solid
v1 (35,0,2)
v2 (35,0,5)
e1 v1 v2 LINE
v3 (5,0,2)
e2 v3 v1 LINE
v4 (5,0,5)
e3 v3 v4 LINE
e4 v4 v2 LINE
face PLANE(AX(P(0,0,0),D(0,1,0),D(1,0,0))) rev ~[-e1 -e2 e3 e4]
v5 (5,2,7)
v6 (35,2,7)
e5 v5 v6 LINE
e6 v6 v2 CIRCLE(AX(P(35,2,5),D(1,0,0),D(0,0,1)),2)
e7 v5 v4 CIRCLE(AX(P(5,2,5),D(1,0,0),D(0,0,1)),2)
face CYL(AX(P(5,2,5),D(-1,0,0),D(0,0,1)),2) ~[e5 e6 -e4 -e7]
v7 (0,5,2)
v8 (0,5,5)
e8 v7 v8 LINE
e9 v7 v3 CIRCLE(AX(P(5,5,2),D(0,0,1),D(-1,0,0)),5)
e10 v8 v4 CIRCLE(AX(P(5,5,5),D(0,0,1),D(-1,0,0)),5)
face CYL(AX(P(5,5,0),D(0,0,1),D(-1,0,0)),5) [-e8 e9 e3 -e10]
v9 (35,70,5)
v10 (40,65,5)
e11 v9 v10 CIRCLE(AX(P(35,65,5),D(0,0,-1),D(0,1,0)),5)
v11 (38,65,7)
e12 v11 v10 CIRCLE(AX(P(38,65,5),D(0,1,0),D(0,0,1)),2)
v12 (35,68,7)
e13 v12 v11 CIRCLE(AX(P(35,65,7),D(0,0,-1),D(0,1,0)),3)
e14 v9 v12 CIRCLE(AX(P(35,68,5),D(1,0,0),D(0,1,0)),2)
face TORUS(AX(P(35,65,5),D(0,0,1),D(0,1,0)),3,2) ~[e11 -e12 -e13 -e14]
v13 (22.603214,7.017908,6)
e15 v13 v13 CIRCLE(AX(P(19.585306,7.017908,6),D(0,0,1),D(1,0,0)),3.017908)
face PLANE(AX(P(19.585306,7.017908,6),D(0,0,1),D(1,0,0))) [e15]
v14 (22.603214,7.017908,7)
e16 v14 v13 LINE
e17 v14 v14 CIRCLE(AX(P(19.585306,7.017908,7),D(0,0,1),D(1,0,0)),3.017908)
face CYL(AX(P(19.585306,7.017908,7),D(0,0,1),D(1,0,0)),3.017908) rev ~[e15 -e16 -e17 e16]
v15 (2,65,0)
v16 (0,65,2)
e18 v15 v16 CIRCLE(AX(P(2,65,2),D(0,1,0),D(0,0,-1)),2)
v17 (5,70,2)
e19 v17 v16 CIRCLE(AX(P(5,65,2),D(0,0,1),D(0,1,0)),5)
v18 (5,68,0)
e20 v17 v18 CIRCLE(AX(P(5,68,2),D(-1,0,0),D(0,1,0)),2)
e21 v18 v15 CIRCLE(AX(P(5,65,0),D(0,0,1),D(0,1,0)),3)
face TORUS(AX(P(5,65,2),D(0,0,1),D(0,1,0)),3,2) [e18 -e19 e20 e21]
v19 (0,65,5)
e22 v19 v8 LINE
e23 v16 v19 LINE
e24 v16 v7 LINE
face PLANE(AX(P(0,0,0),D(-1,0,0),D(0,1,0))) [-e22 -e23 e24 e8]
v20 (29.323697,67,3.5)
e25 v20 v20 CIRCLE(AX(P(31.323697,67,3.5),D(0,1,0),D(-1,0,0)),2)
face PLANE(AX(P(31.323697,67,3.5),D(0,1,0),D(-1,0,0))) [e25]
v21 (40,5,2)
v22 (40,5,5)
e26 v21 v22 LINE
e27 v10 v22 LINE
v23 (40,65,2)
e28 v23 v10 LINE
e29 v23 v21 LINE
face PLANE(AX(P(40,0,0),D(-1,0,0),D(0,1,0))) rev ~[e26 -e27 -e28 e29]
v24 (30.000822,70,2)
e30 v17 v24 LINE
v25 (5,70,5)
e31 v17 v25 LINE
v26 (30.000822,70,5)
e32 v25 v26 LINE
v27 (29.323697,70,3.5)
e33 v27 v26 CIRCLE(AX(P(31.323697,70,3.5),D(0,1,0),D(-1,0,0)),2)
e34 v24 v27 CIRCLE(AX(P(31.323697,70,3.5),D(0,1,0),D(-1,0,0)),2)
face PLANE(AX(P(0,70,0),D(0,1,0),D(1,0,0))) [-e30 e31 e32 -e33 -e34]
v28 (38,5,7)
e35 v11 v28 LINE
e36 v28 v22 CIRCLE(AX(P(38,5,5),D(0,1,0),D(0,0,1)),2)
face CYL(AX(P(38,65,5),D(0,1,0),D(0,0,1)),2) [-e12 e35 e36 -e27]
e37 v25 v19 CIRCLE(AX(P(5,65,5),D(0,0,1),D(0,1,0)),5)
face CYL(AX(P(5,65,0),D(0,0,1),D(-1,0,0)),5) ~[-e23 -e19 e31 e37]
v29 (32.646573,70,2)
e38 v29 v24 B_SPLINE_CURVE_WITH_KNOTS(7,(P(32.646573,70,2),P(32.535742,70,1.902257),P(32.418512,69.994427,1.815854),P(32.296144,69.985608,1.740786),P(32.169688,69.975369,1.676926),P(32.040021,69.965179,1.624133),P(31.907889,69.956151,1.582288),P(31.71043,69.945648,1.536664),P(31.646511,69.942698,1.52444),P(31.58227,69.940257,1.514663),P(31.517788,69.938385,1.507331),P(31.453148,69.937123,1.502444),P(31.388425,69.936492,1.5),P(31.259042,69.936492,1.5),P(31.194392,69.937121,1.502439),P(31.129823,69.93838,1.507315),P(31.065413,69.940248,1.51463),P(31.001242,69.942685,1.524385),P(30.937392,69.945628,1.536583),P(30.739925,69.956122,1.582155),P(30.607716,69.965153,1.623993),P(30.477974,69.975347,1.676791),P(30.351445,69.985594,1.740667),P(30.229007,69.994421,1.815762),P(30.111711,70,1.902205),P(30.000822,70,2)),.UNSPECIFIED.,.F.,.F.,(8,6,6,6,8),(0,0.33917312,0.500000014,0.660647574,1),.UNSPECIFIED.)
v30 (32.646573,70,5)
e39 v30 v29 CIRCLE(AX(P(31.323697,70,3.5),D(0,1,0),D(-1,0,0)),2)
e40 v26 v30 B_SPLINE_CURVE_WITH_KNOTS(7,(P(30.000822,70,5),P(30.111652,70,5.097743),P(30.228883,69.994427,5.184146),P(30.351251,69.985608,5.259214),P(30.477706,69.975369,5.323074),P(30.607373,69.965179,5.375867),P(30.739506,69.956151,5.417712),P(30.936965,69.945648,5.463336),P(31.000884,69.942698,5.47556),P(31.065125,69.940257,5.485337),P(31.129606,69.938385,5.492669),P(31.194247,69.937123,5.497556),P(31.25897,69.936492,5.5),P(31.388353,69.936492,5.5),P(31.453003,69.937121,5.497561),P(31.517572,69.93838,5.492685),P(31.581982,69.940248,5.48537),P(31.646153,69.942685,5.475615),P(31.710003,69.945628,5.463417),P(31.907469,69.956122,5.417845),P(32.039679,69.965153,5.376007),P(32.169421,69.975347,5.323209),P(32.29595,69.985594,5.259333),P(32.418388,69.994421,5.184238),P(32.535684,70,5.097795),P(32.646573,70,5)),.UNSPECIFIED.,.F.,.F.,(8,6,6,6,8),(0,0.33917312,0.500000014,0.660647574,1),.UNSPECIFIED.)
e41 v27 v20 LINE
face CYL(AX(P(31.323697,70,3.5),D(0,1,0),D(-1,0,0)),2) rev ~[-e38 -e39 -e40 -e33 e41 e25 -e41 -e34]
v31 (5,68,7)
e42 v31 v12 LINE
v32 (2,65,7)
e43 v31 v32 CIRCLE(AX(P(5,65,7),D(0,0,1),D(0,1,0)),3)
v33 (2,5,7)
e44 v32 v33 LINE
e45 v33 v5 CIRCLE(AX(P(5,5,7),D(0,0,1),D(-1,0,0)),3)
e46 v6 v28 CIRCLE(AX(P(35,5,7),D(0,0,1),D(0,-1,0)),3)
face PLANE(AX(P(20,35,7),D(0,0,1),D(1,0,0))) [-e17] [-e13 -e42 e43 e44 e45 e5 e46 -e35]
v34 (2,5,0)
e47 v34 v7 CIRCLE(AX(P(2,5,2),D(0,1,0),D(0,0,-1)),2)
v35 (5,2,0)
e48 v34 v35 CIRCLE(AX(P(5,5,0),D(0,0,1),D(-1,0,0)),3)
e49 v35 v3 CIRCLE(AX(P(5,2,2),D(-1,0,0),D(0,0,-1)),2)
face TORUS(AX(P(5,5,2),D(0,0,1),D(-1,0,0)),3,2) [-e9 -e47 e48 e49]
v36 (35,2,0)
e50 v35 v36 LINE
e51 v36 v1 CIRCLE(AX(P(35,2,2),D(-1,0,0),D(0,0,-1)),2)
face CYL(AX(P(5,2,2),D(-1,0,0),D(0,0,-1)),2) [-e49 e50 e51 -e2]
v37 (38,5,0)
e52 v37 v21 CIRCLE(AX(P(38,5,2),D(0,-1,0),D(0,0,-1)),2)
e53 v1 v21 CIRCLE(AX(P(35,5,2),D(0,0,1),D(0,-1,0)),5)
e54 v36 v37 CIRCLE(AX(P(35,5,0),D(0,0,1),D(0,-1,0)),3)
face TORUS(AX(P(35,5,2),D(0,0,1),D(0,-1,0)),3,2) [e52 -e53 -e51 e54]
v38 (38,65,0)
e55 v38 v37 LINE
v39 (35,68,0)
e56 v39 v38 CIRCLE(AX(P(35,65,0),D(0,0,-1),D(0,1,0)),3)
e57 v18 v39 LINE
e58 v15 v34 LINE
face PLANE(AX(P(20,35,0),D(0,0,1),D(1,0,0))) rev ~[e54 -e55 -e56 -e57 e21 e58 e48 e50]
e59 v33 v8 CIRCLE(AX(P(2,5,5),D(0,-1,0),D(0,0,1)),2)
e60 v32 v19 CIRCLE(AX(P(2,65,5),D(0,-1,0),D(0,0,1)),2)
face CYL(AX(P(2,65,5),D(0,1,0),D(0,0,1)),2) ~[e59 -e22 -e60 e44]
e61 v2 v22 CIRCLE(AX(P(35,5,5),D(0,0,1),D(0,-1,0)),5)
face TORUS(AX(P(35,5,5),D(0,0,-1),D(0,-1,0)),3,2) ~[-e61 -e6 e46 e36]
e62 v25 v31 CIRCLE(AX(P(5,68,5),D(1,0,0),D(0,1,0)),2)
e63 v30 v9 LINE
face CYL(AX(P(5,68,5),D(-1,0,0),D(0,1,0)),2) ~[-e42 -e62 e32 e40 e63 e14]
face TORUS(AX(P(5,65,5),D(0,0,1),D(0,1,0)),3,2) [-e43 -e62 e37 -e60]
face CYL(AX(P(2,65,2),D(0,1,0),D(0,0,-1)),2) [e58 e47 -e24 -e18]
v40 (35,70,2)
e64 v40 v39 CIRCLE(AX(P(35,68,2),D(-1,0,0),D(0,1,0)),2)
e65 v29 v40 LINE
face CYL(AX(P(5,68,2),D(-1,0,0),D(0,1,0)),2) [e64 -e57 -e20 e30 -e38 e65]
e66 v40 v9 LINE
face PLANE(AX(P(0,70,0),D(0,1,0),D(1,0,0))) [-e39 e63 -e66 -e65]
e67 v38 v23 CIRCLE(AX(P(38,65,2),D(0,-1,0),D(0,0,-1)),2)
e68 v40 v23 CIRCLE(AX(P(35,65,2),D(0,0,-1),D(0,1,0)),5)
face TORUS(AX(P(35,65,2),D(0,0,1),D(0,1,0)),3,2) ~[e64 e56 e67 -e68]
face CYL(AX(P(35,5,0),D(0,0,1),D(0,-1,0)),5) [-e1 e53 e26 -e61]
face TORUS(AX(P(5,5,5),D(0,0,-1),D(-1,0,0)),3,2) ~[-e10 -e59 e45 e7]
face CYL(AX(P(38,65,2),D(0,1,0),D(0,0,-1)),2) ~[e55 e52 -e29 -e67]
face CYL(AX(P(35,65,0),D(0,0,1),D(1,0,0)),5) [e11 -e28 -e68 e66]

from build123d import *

# Parameters (mm, degrees)
F0_W         = 40
F0_H         = 70
F1_DEPTH     = 7
F2_R         = 5
F3_R         = 2
F4_DEPTH     = 3
F6_T1_DEPTH  = 60
F6_T3_DEPTH  = 30
F6_T6_ANGLE  = 90
F6_T8_ANGLE  = 90
F6_T10_ANGLE = 90
F6_T12_ANGLE = 90
F6_T14_ANGLE = 90
F6_T16_ANGLE = 90
F6_T18_ANGLE = 90
F6_T20_ANGLE = 90
F7_R         = 3.0179077215
F8_DEPTH     = 1


# Not quite as in the source:
# - a fillet or chamfer that OpenCascade refuses, or shapes differently, is made with other operations: its cross-section is extruded or revolved along the edge and cut away or added
# - a feature of the source that left no trace in its solid (it failed there, or was rolled back) is left out


with BuildPart() as f1:
    # F0 (on Top) → F1 (new body)
    with BuildSketch(Plane.XY):
        with Locations((20, 35)):
            Rectangle(F0_W, F0_H)
    extrude(amount=F1_DEPTH)

    # F2
    f2_edges = [f1.edges().sort_by_distance(p)[0] for p in [
        (40, 0, 3.5),
        (40, 70, 3.5),
        (0, 70, 3.5),
        (0, 0, 3.5),
    ]]
    fillet(f2_edges, radius=F2_R)

    # F3 (on face) → F4 (cut)
    with BuildSketch(Plane(origin=(0, 70, 0), x_dir=(-1, 0, 0), z_dir=(0, 1, 0))):
        with Locations((-31.323697418, 3.5)):
            Circle(F3_R)
    extrude(amount=-F4_DEPTH, mode=Mode.SUBTRACT)

    # F6: fillet of radius 2 on 16 edges, made by hand

    # F6_s2 → F6_t1 (cut)
    with BuildSketch(Plane.XZ.offset(-65)):
        with BuildLine():
            ThreePointArc((2, 7), (0.5857864376, 6.4142135624), (0, 5))
            Line((0, 5), (0, 7))
            Line((0, 7), (2, 7))
        make_face()
        with BuildLine():
            ThreePointArc((38, 0), (39.4142135624, 0.5857864376), (40, 2))
            Line((40, 2), (40, 0))
            Line((40, 0), (38, 0))
        make_face()
        with BuildLine():
            ThreePointArc((2, 0), (0.5857864376, 0.5857864376), (0, 2))
            Line((0, 2), (0, 0))
            Line((0, 0), (2, 0))
        make_face()
        with BuildLine():
            ThreePointArc((38, 7), (39.4142135624, 6.4142135624), (40, 5))
            Line((40, 5), (40, 7))
            Line((40, 7), (38, 7))
        make_face()
    extrude(amount=F6_T1_DEPTH, mode=Mode.SUBTRACT)

    # F6_s4 → F6_t3 (cut)
    with BuildSketch(Plane.YZ.offset(5)):
        with BuildLine():
            ThreePointArc((70, 2), (69.4142135624, 0.5857864376), (68, 0))
            Line((68, 0), (70, 0))
            Line((70, 0), (70, 2))
        make_face()
        with BuildLine():
            ThreePointArc((70, 5), (69.4142135624, 6.4142135624), (68, 7))
            Line((68, 7), (70, 7))
            Line((70, 7), (70, 5))
        make_face()
        with BuildLine():
            ThreePointArc((2, 0), (0.5857864376, 0.5857864376), (0, 2))
            Line((0, 2), (0, 0))
            Line((0, 0), (2, 0))
        make_face()
        with BuildLine():
            ThreePointArc((2, 7), (0.5857864376, 6.4142135624), (0, 5))
            Line((0, 5), (0, 7))
            Line((0, 7), (2, 7))
        make_face()
    extrude(amount=F6_T3_DEPTH, mode=Mode.SUBTRACT)

    # F6_s5 → F6_t6 (revolve, cut)
    with BuildSketch(Plane.YZ.offset(35)):
        with BuildLine():
            ThreePointArc((68, 0), (69.4142135624, 0.5857864376), (70, 2))
            Line((70, 2), (70, 0))
            Line((70, 0), (68, 0))
        make_face()
    revolve(axis=Axis((35, 65, 0), (0, 0, -1)), revolution_arc=F6_T6_ANGLE, mode=Mode.SUBTRACT)

    # F6_s7 → F6_t8 (revolve, cut)
    with BuildSketch(Plane.YZ.offset(5)):
        with BuildLine():
            ThreePointArc((68, 0), (69.4142135624, 0.5857864376), (70, 2))
            Line((70, 2), (70, 0))
            Line((70, 0), (68, 0))
        make_face()
    revolve(axis=Axis((5, 65, 0), (0, 0, 1)), revolution_arc=F6_T8_ANGLE, mode=Mode.SUBTRACT)

    # F6_s9 → F6_t10 (revolve, cut)
    with BuildSketch(Plane.YZ.offset(35)):
        with BuildLine():
            ThreePointArc((2, 0), (0.5857864376, 0.5857864376), (0, 2))
            Line((0, 2), (0, 0))
            Line((0, 0), (2, 0))
        make_face()
    revolve(axis=Axis((35, 5, 0), (0, 0, 1)), revolution_arc=F6_T10_ANGLE, mode=Mode.SUBTRACT)

    # F6_s11 → F6_t12 (revolve, cut)
    with BuildSketch(Plane.XZ.offset(-5)):
        with BuildLine():
            ThreePointArc((2, 0), (0.5857864376, 0.5857864376), (0, 2))
            Line((0, 2), (0, 0))
            Line((0, 0), (2, 0))
        make_face()
    revolve(axis=Axis((5, 5, 0), (0, 0, 1)), revolution_arc=F6_T12_ANGLE, mode=Mode.SUBTRACT)

    # F6_s13 → F6_t14 (revolve, cut)
    with BuildSketch(Plane.YZ.offset(35)):
        with BuildLine():
            ThreePointArc((70, 5), (69.4142135624, 6.4142135624), (68, 7))
            Line((68, 7), (70, 7))
            Line((70, 7), (70, 5))
        make_face()
    revolve(axis=Axis((35, 65, 7), (0, 0, -1)), revolution_arc=F6_T14_ANGLE, mode=Mode.SUBTRACT)

    # F6_s15 → F6_t16 (revolve, cut)
    with BuildSketch(Plane.YZ.offset(5)):
        with BuildLine():
            ThreePointArc((70, 5), (69.4142135624, 6.4142135624), (68, 7))
            Line((68, 7), (70, 7))
            Line((70, 7), (70, 5))
        make_face()
    revolve(axis=Axis((5, 65, 7), (0, 0, 1)), revolution_arc=F6_T16_ANGLE, mode=Mode.SUBTRACT)

    # F6_s17 → F6_t18 (revolve, cut)
    with BuildSketch(Plane.YZ.offset(35)):
        with BuildLine():
            ThreePointArc((2, 7), (0.5857864376, 6.4142135624), (0, 5))
            Line((0, 5), (0, 7))
            Line((0, 7), (2, 7))
        make_face()
    revolve(axis=Axis((35, 5, 7), (0, 0, 1)), revolution_arc=F6_T18_ANGLE, mode=Mode.SUBTRACT)

    # F6_s19 → F6_t20 (revolve, cut)
    with BuildSketch(Plane.XZ.offset(-5)):
        with BuildLine():
            ThreePointArc((2, 7), (0.5857864376, 6.4142135624), (0, 5))
            Line((0, 5), (0, 7))
            Line((0, 7), (2, 7))
        make_face()
    revolve(axis=Axis((5, 5, 7), (0, 0, 1)), revolution_arc=F6_T20_ANGLE, mode=Mode.SUBTRACT)

    # F7 (on face) → F8 (cut)
    with BuildSketch(Plane.XY.offset(7)):
        with Locations((19.5853062672, 7.0179077215)):
            Circle(F7_R)
    extrude(amount=-F8_DEPTH, mode=Mode.SUBTRACT)


solid = f1.part
